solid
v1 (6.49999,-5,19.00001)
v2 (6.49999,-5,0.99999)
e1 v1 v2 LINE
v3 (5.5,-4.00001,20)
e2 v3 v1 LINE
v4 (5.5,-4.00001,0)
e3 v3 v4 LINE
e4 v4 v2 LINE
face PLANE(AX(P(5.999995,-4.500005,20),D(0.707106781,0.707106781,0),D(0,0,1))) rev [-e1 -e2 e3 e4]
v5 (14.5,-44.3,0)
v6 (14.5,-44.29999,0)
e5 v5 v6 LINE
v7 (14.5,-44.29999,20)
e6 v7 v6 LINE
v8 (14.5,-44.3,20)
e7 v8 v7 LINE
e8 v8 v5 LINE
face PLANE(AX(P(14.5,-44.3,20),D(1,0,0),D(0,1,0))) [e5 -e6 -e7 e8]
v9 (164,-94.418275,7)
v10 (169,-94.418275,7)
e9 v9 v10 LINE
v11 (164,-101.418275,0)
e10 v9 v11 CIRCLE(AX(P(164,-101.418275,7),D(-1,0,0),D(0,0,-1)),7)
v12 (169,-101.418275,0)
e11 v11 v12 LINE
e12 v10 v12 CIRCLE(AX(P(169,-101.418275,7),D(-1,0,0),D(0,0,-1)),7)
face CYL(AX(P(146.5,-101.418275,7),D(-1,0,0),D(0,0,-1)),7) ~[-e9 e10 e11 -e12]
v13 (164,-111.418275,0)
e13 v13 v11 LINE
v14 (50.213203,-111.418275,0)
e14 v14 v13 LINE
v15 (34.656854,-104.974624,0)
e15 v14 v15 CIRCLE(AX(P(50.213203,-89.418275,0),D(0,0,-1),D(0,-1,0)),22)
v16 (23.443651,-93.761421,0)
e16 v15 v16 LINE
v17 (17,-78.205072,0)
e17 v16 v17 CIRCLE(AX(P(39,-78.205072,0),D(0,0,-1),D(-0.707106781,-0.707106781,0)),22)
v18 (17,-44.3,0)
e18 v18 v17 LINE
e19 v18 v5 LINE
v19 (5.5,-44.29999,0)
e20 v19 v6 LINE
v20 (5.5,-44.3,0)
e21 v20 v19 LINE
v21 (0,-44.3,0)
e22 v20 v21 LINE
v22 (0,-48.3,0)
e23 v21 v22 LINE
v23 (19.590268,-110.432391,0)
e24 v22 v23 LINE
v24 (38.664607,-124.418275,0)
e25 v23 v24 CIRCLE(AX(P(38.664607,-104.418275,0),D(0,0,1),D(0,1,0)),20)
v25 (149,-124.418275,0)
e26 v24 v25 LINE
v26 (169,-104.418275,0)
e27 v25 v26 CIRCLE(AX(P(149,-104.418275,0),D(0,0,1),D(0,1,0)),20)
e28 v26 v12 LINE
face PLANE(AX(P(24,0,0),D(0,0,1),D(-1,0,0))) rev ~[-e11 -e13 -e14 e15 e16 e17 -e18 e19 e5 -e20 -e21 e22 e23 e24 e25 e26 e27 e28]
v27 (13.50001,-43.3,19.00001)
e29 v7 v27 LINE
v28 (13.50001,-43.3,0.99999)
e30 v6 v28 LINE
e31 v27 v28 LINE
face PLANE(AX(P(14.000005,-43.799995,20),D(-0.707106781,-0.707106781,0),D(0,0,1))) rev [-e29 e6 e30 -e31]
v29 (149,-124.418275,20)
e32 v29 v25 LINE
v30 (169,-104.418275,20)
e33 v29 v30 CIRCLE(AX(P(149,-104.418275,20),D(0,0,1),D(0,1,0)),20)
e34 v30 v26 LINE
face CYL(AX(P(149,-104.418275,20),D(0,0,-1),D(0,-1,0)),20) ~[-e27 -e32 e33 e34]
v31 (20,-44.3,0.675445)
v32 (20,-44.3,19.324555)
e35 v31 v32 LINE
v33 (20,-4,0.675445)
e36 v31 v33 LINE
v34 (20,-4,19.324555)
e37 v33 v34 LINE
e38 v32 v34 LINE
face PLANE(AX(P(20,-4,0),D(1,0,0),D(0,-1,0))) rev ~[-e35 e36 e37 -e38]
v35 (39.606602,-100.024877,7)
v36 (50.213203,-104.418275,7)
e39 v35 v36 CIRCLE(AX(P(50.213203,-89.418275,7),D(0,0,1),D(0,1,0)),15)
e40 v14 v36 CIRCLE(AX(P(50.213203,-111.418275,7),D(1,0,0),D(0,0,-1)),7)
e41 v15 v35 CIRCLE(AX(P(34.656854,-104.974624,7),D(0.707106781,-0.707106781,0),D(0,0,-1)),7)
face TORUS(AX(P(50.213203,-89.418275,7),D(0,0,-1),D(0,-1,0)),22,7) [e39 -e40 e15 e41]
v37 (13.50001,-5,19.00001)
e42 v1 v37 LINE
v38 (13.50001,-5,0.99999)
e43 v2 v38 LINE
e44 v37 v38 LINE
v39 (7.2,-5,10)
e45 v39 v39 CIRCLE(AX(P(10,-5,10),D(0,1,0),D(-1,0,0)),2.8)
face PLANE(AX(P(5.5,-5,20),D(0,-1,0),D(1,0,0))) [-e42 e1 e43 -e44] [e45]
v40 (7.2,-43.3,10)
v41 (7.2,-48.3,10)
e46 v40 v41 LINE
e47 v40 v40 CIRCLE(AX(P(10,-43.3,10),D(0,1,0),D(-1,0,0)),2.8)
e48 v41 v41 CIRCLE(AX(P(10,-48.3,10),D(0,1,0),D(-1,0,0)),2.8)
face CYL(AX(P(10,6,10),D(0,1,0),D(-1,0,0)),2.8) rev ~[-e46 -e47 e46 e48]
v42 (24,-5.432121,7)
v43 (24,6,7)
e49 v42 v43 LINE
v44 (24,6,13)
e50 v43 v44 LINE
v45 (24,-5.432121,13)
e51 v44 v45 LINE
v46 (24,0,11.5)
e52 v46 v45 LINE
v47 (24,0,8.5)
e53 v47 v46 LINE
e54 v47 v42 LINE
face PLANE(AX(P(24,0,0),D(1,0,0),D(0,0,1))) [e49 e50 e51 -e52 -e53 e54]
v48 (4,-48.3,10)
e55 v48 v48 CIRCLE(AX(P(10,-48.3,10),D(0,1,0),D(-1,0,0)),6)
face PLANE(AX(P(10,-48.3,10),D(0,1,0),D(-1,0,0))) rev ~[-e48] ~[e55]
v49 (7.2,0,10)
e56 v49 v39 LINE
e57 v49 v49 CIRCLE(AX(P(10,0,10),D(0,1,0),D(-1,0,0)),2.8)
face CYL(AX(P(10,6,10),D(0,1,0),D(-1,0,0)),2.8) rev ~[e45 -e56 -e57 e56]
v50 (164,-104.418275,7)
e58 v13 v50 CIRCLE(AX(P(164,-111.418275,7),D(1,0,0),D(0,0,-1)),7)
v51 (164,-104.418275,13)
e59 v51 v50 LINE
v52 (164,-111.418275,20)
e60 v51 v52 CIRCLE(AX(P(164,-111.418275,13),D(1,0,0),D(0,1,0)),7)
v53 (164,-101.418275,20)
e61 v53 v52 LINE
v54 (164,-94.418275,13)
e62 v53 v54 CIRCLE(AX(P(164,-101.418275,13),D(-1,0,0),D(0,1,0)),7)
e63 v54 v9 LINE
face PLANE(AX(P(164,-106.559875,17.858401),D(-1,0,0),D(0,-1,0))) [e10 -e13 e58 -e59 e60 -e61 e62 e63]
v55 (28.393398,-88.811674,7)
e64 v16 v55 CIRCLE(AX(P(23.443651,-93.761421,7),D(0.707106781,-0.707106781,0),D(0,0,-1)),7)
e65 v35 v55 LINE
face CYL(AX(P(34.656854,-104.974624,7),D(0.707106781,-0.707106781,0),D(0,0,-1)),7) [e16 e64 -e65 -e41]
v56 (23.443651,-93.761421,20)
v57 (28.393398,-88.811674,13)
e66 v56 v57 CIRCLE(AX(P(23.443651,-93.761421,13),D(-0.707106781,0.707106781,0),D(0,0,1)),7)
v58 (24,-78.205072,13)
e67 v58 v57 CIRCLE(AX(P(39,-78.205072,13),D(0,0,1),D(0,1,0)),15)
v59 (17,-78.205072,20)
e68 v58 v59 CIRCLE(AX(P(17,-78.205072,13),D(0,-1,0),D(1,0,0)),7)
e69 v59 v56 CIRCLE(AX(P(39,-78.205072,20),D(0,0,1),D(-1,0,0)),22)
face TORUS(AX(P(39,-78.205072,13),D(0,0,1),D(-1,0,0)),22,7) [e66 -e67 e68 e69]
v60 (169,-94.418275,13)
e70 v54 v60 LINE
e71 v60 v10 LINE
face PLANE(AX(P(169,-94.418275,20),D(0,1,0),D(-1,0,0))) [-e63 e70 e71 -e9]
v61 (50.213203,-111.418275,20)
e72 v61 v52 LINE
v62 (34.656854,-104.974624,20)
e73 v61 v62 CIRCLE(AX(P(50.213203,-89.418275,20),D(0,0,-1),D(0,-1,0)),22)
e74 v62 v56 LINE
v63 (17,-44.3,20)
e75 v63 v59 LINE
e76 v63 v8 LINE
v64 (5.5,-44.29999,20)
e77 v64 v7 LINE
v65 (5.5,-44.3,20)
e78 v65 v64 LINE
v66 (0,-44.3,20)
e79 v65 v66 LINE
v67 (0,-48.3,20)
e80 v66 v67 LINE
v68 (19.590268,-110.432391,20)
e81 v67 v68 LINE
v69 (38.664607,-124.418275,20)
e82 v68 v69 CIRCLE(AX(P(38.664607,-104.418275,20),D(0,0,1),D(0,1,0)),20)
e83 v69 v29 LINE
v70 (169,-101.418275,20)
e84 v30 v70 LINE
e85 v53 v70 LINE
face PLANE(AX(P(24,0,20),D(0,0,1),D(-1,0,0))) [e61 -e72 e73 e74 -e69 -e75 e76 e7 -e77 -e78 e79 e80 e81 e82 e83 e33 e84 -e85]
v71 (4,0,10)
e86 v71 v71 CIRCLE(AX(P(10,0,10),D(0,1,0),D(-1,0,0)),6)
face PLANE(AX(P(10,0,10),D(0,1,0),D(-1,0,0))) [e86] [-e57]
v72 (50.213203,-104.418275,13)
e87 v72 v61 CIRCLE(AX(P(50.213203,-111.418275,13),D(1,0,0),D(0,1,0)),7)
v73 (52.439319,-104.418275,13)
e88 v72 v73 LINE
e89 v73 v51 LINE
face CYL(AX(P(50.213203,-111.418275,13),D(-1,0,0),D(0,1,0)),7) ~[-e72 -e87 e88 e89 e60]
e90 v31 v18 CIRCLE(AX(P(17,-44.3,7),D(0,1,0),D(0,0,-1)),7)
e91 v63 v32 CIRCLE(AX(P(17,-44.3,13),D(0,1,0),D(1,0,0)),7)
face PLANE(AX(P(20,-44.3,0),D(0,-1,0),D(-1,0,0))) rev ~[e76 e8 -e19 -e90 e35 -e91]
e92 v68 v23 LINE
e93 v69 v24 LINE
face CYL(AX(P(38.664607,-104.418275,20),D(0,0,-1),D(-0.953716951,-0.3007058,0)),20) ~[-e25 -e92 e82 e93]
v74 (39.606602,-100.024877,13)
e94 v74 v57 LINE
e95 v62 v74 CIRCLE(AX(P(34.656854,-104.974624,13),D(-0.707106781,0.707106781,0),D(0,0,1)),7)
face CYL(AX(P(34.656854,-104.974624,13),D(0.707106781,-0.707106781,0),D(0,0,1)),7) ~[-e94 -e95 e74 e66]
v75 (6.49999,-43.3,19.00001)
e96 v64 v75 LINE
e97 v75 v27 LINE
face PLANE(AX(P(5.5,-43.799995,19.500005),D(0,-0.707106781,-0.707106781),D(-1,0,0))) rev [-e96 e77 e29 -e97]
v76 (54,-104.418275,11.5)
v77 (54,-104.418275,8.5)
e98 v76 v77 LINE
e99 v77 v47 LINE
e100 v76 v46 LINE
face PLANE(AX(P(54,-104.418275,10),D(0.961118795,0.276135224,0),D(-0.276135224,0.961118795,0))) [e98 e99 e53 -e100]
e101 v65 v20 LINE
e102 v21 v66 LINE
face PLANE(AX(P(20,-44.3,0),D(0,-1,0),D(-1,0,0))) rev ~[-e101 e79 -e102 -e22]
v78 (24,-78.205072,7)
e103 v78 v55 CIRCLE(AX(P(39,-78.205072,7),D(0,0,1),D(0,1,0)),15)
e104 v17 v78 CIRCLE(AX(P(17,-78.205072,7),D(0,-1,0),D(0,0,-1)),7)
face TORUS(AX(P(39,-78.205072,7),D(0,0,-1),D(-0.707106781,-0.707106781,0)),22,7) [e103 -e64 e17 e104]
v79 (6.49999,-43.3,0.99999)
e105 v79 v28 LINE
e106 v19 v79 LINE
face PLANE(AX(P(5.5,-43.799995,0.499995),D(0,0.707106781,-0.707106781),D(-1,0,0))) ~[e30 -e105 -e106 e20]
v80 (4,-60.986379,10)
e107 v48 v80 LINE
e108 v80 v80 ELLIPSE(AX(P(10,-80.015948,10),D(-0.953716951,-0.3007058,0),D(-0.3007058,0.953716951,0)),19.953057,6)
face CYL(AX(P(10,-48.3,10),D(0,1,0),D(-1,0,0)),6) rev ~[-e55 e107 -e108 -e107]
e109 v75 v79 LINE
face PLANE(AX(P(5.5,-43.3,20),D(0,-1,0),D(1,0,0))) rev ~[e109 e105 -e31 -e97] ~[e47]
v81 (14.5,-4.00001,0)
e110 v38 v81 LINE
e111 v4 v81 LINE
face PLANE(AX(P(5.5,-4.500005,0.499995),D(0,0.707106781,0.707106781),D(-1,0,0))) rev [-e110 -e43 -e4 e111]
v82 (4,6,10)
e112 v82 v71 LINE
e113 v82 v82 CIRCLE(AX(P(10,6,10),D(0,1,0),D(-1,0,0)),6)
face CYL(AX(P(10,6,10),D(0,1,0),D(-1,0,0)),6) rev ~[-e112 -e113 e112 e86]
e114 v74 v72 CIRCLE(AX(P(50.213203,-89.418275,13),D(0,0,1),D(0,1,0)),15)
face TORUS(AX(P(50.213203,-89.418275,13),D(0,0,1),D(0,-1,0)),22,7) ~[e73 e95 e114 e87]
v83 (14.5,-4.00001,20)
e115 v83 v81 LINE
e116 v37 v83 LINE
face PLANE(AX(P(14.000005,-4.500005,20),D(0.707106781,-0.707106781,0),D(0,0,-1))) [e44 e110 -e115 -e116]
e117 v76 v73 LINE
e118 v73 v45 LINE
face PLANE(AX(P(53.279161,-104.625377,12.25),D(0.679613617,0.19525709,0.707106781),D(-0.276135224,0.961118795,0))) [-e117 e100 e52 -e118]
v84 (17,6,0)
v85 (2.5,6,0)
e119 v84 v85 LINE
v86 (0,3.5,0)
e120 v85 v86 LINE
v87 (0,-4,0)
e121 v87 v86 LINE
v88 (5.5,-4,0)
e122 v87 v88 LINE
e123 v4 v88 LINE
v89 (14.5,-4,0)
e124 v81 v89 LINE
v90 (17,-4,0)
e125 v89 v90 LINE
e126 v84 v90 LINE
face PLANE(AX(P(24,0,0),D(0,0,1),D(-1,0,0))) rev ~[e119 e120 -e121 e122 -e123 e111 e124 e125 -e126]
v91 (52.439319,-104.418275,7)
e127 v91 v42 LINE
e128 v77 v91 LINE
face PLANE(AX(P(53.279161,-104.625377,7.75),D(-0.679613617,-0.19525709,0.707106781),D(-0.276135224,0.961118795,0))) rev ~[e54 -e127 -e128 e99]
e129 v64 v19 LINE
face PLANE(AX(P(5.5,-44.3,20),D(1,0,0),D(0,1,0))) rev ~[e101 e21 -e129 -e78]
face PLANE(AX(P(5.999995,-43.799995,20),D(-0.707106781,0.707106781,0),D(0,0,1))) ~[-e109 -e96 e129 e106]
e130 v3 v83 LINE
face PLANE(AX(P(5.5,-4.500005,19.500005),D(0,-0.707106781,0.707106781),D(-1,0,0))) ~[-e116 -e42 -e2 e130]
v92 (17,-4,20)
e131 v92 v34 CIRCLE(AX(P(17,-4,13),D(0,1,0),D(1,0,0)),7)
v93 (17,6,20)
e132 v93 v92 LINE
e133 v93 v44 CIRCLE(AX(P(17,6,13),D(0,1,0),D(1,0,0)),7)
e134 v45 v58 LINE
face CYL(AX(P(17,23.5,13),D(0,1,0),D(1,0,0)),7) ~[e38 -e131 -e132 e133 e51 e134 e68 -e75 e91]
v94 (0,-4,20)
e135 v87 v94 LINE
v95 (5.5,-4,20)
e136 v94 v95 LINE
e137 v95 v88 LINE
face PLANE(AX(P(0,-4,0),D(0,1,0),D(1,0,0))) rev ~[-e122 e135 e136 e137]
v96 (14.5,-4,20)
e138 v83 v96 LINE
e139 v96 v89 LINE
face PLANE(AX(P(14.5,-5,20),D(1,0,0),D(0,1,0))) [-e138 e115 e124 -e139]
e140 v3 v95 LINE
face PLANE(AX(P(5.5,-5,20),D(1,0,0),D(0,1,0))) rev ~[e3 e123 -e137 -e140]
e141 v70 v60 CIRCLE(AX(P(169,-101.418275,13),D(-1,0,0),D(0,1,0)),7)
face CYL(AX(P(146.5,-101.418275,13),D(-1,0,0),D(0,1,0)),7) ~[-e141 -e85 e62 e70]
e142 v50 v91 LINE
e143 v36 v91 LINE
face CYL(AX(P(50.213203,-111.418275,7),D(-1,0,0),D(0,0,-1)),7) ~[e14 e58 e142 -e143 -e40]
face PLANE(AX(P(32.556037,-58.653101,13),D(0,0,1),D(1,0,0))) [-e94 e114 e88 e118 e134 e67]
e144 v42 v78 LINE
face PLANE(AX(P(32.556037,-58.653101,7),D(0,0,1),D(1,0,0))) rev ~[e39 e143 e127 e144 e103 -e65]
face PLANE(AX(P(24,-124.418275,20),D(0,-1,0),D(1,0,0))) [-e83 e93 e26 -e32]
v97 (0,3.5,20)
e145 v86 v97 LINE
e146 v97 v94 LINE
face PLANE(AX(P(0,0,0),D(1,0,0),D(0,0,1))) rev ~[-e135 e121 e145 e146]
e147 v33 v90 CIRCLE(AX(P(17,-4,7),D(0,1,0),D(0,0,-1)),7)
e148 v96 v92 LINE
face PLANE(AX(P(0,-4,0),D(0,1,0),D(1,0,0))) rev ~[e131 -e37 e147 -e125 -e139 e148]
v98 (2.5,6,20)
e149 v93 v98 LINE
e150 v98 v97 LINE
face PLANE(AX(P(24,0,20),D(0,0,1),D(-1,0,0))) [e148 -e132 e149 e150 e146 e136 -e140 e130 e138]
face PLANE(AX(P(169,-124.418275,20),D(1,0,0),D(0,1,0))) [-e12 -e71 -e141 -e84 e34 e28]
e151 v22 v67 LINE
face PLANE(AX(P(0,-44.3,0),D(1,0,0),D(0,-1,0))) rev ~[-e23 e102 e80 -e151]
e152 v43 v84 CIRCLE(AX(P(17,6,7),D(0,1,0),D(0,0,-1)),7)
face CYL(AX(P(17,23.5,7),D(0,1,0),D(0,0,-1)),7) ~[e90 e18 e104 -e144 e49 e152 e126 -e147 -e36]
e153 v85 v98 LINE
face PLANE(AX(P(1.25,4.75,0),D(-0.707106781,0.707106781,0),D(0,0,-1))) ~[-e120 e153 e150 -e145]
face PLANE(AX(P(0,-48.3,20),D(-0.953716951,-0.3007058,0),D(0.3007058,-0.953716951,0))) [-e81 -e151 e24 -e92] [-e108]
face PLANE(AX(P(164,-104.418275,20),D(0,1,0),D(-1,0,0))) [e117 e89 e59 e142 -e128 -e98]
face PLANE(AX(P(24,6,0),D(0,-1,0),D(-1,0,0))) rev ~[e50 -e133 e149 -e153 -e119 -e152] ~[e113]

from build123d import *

# Parameters (mm, degrees)
F1_DEPTH      = 20
F2_W          = 9
F2_H          = 1
F3_DEPTH      = 20
F4_SIZE       = 0.99999
F6_DEPTH      = 20
F9_DEPTH      = 3
F10_SIZE      = 20
F11_DEPTH     = 6
F13_R         = 2.8
F14_DEPTH     = 130.4192752567
F15_R         = 6
F16_DEPTH     = 76.1192752567
F17_R         = 6
F18_DEPTH     = 6
F19_R         = 15
F20_T1_DEPTH  = 113.7867965644
F20_T3_DEPTH  = 40
F20_T5_DEPTH  = 15.8578643763
F20_T7_DEPTH  = 101.7050718211
F20_T10_ANGLE = 45
F20_T12_ANGLE = 45
F20_T14_ANGLE = 45
F20_T16_ANGLE = 45
F21_SIZE      = 1.5
F22_R         = 20
F23_SIZE      = 2.5


# Not quite as in the source:
# - a fillet or chamfer that OpenCascade refuses, or shapes differently, is made with other operations: its cross-section is extruded or revolved along the edge and cut away or added
# - a fillet or chamfer is up to 0.001 mm smaller than in the source, because OpenCascade refuses the exact size


with BuildPart() as f1:
    # F0 (on Top) → F1 (new body)
    with BuildSketch(Plane.XY):
        Polygon((24, 0), (0, 0), (0, -4), (20, -4), (20, -44.3), (0, -44.3), (0, -48.3), (24, -48.3), align=None)
    extrude(amount=F1_DEPTH)

    # F2 (on face) → F3 (join, through all)
    with BuildSketch(Plane.XY.offset(20)):
        with Locations((10, -4.5)):
            Rectangle(F2_W, F2_H)
        with Locations((10, -43.8)):
            Rectangle(F2_W, F2_H)
    extrude(amount=-F3_DEPTH)

    # F4 (size 1 in the source; OpenCascade refuses exactly that, so slightly less here)
    f4_edges = [f1.edges().sort_by_distance(p)[0] for p in [
        (5.5, -5, 10),
        (14.5, -5, 10),
        (10, -5, 20),
        (10, -5, 0),
        (14.5, -43.3, 10),
        (5.5, -43.3, 10),
        (10, -43.3, 20),
        (10, -43.3, 0),
    ]]
    chamfer(f4_edges, length=F4_SIZE)

    # F5 (on face) → F6 (join, through all)
    with BuildSketch(Plane.XY.offset(20)):
        Polygon((24, -48.3), (0, -48.3), (24, -124.4182752567), (169, -124.4182752567), (169, -94.4182752567), (164, -94.4182752567), (164, -104.4182752567), (24, -104.4182752567), align=None)
    extrude(amount=-F6_DEPTH)

    # F8 (on offset) → F9 (join, symmetric)
    with BuildSketch(Plane.XY.offset(10)):
        Polygon((54, -104.4182752567), (24, 0), (24, -104.4182752567), align=None)
    extrude(amount=F9_DEPTH, both=True)

    # F10
    f10_edges = [f1.edges().sort_by_distance(p)[0] for p in [
        (24, -104.418275, 16.5),
        (24, -104.418275, 3.5),
    ]]
    chamfer(f10_edges, length=F10_SIZE)

    # F11 (add): a face of the model
    f11_faces = [f1.faces().sort_by_distance(p)[0] for p in [
        (12, 0, 10),
    ]]
    extrude(f11_faces, amount=F11_DEPTH)

    # F13 (on face) → F14 (cut, through all)
    with BuildSketch(Plane(origin=(0, 6, 0), x_dir=(-1, 0, 0), z_dir=(0, 1, 0))):
        with Locations((-10, 10)):
            Circle(F13_R)
    extrude(amount=-F14_DEPTH, mode=Mode.SUBTRACT)

    # F15 (on offset) → F16 (cut, through all)
    with BuildSketch(Plane(origin=(0, -48.3, 0), x_dir=(-1, 0, 0), z_dir=(0, 1, 0))):
        with Locations((-10, 10)):
            Circle(F15_R)
    extrude(amount=-F16_DEPTH, mode=Mode.SUBTRACT)

    # F17 (on face) → F18 (cut)
    with BuildSketch(Plane(origin=(0, 6, 0), x_dir=(-1, 0, 0), z_dir=(0, 1, 0))):
        with Locations((-10, 10)):
            Circle(F17_R)
    extrude(amount=-F18_DEPTH, mode=Mode.SUBTRACT)

    # F19
    f19_edges = [f1.edges().sort_by_distance(p)[0] for p in [
        (44, -104.418275, 3.5),
        (24, -84.418275, 3.5),
        (24, -84.418275, 16.5),
        (44, -104.418275, 16.5),
    ]]
    fillet(f19_edges, radius=F19_R)

    # F20: fillet of radius 7 on 12 edges, made by hand

    # F20_s2 → F20_t1 (cut)
    with BuildSketch(Plane.YZ.offset(50.2132034356)):
        with BuildLine():
            ThreePointArc((-104.4182752567, 13), (-106.4685277884, 17.9497474683), (-111.4182752567, 20))
            Line((-111.4182752567, 20), (-104.4182752567, 20))
            Line((-104.4182752567, 20), (-104.4182752567, 13))
        make_face()
        with BuildLine():
            ThreePointArc((-111.4182752567, 0), (-106.4685277884, 2.0502525317), (-104.4182752567, 7))
            Line((-104.4182752567, 7), (-104.4182752567, 0))
            Line((-104.4182752567, 0), (-111.4182752567, 0))
        make_face()
    extrude(amount=F20_T1_DEPTH, mode=Mode.SUBTRACT)

    # F20_s4 → F20_t3 (cut)
    with BuildSketch(Plane.YZ.offset(146.5)):
        with BuildLine():
            ThreePointArc((-101.4182752567, 0), (-96.4685277884, 2.0502525317), (-94.4182752567, 7))
            Line((-94.4182752567, 7), (-94.4182752567, 0))
            Line((-94.4182752567, 0), (-101.4182752567, 0))
        make_face()
        with BuildLine():
            ThreePointArc((-94.4182752567, 13), (-96.4685277884, 17.9497474683), (-101.4182752567, 20))
            Line((-101.4182752567, 20), (-94.4182752567, 20))
            Line((-94.4182752567, 20), (-94.4182752567, 13))
        make_face()
    extrude(amount=F20_T3_DEPTH, mode=Mode.SUBTRACT)

    # F20_s6 → F20_t5 (cut)
    with BuildSketch(Plane(origin=(69.8157393462, -69.8157393462, 0), x_dir=(0, 0, 1), z_dir=(-0.7071067812, 0.7071067812, 0))):
        with BuildLine():
            ThreePointArc((0, -49.7221721416), (2.0502525317, -44.7724246733), (7, -42.7221721416))
            Line((7, -42.7221721416), (0, -42.7221721416))
            Line((0, -42.7221721416), (0, -49.7221721416))
        make_face()
        with BuildLine():
            ThreePointArc((20, -49.7221721416), (17.9497474683, -44.7724246733), (13, -42.7221721416))
            Line((13, -42.7221721416), (20, -42.7221721416))
            Line((20, -42.7221721416), (20, -49.7221721416))
        make_face()
    extrude(amount=F20_T5_DEPTH, mode=Mode.SUBTRACT)

    # F20_s8 → F20_t7 (cut)
    with BuildSketch(Plane.XZ.offset(-23.5)):
        with BuildLine():
            ThreePointArc((17, 0), (21.9497474683, 2.0502525317), (24, 7))
            Line((24, 7), (24, 0))
            Line((24, 0), (17, 0))
        make_face()
        with BuildLine():
            ThreePointArc((24, 13), (21.9497474683, 17.9497474683), (17, 20))
            Line((17, 20), (24, 20))
            Line((24, 20), (24, 13))
        make_face()
    extrude(amount=F20_T7_DEPTH, mode=Mode.SUBTRACT)

    # F20_s9 → F20_t10 (revolve, cut)
    with BuildSketch(Plane.YZ.offset(50.2132034356)):
        with BuildLine():
            ThreePointArc((-111.4182752567, 0), (-106.4685277884, 2.0502525317), (-104.4182752567, 7))
            Line((-104.4182752567, 7), (-104.4182752567, 0))
            Line((-104.4182752567, 0), (-111.4182752567, 0))
        make_face()
    revolve(axis=Axis((50.2132034356, -89.4182752567, 0), (0, 0, -1)), revolution_arc=F20_T10_ANGLE, mode=Mode.SUBTRACT)

    # F20_s11 → F20_t12 (revolve, cut)
    with BuildSketch(Plane(origin=(58.6025359106, -58.6025359106, 0), x_dir=(0, 0, 1), z_dir=(0.7071067812, -0.7071067812, 0))):
        with BuildLine():
            ThreePointArc((0, 49.7221721416), (2.0502525317, 44.7724246733), (7, 42.7221721416))
            Line((7, 42.7221721416), (0, 42.7221721416))
            Line((0, 42.7221721416), (0, 49.7221721416))
        make_face()
    revolve(axis=Axis((39, -78.2050718211, 0), (0, 0, -1)), revolution_arc=F20_T12_ANGLE, mode=Mode.SUBTRACT)

    # F20_s13 → F20_t14 (revolve, cut)
    with BuildSketch(Plane.YZ.offset(50.2132034356)):
        with BuildLine():
            ThreePointArc((-111.4182752567, 20), (-106.4685277884, 17.9497474683), (-104.4182752567, 13))
            Line((-104.4182752567, 13), (-104.4182752567, 20))
            Line((-104.4182752567, 20), (-111.4182752567, 20))
        make_face()
    revolve(axis=Axis((50.2132034356, -89.4182752567, 20), (0, 0, -1)), revolution_arc=F20_T14_ANGLE, mode=Mode.SUBTRACT)

    # F20_s15 → F20_t16 (revolve, cut)
    with BuildSketch(Plane.XZ.offset(78.2050718211)):
        with BuildLine():
            ThreePointArc((17, 20), (21.9497474683, 17.9497474683), (24, 13))
            Line((24, 13), (24, 20))
            Line((24, 20), (17, 20))
        make_face()
    revolve(axis=Axis((39, -78.2050718211, 20), (0, 0, 1)), revolution_arc=F20_T16_ANGLE, mode=Mode.SUBTRACT)

    # F21
    f21_edges = [f1.edges().sort_by_distance(p)[0] for p in [
        (39, -52.209138, 13),
        (39, -52.209138, 7),
    ]]
    chamfer(f21_edges, length=F21_SIZE)

    # F22
    f22_edges = [f1.edges().sort_by_distance(p)[0] for p in [
        (24, -124.418275, 10),
        (169, -124.418275, 10),
    ]]
    fillet(f22_edges, radius=F22_R)

    # F23
    f23_edges = [f1.edges().sort_by_distance(p)[0] for p in [
        (0, 6, 10),
    ]]
    chamfer(f23_edges, length=F23_SIZE)


solid = f1.part
